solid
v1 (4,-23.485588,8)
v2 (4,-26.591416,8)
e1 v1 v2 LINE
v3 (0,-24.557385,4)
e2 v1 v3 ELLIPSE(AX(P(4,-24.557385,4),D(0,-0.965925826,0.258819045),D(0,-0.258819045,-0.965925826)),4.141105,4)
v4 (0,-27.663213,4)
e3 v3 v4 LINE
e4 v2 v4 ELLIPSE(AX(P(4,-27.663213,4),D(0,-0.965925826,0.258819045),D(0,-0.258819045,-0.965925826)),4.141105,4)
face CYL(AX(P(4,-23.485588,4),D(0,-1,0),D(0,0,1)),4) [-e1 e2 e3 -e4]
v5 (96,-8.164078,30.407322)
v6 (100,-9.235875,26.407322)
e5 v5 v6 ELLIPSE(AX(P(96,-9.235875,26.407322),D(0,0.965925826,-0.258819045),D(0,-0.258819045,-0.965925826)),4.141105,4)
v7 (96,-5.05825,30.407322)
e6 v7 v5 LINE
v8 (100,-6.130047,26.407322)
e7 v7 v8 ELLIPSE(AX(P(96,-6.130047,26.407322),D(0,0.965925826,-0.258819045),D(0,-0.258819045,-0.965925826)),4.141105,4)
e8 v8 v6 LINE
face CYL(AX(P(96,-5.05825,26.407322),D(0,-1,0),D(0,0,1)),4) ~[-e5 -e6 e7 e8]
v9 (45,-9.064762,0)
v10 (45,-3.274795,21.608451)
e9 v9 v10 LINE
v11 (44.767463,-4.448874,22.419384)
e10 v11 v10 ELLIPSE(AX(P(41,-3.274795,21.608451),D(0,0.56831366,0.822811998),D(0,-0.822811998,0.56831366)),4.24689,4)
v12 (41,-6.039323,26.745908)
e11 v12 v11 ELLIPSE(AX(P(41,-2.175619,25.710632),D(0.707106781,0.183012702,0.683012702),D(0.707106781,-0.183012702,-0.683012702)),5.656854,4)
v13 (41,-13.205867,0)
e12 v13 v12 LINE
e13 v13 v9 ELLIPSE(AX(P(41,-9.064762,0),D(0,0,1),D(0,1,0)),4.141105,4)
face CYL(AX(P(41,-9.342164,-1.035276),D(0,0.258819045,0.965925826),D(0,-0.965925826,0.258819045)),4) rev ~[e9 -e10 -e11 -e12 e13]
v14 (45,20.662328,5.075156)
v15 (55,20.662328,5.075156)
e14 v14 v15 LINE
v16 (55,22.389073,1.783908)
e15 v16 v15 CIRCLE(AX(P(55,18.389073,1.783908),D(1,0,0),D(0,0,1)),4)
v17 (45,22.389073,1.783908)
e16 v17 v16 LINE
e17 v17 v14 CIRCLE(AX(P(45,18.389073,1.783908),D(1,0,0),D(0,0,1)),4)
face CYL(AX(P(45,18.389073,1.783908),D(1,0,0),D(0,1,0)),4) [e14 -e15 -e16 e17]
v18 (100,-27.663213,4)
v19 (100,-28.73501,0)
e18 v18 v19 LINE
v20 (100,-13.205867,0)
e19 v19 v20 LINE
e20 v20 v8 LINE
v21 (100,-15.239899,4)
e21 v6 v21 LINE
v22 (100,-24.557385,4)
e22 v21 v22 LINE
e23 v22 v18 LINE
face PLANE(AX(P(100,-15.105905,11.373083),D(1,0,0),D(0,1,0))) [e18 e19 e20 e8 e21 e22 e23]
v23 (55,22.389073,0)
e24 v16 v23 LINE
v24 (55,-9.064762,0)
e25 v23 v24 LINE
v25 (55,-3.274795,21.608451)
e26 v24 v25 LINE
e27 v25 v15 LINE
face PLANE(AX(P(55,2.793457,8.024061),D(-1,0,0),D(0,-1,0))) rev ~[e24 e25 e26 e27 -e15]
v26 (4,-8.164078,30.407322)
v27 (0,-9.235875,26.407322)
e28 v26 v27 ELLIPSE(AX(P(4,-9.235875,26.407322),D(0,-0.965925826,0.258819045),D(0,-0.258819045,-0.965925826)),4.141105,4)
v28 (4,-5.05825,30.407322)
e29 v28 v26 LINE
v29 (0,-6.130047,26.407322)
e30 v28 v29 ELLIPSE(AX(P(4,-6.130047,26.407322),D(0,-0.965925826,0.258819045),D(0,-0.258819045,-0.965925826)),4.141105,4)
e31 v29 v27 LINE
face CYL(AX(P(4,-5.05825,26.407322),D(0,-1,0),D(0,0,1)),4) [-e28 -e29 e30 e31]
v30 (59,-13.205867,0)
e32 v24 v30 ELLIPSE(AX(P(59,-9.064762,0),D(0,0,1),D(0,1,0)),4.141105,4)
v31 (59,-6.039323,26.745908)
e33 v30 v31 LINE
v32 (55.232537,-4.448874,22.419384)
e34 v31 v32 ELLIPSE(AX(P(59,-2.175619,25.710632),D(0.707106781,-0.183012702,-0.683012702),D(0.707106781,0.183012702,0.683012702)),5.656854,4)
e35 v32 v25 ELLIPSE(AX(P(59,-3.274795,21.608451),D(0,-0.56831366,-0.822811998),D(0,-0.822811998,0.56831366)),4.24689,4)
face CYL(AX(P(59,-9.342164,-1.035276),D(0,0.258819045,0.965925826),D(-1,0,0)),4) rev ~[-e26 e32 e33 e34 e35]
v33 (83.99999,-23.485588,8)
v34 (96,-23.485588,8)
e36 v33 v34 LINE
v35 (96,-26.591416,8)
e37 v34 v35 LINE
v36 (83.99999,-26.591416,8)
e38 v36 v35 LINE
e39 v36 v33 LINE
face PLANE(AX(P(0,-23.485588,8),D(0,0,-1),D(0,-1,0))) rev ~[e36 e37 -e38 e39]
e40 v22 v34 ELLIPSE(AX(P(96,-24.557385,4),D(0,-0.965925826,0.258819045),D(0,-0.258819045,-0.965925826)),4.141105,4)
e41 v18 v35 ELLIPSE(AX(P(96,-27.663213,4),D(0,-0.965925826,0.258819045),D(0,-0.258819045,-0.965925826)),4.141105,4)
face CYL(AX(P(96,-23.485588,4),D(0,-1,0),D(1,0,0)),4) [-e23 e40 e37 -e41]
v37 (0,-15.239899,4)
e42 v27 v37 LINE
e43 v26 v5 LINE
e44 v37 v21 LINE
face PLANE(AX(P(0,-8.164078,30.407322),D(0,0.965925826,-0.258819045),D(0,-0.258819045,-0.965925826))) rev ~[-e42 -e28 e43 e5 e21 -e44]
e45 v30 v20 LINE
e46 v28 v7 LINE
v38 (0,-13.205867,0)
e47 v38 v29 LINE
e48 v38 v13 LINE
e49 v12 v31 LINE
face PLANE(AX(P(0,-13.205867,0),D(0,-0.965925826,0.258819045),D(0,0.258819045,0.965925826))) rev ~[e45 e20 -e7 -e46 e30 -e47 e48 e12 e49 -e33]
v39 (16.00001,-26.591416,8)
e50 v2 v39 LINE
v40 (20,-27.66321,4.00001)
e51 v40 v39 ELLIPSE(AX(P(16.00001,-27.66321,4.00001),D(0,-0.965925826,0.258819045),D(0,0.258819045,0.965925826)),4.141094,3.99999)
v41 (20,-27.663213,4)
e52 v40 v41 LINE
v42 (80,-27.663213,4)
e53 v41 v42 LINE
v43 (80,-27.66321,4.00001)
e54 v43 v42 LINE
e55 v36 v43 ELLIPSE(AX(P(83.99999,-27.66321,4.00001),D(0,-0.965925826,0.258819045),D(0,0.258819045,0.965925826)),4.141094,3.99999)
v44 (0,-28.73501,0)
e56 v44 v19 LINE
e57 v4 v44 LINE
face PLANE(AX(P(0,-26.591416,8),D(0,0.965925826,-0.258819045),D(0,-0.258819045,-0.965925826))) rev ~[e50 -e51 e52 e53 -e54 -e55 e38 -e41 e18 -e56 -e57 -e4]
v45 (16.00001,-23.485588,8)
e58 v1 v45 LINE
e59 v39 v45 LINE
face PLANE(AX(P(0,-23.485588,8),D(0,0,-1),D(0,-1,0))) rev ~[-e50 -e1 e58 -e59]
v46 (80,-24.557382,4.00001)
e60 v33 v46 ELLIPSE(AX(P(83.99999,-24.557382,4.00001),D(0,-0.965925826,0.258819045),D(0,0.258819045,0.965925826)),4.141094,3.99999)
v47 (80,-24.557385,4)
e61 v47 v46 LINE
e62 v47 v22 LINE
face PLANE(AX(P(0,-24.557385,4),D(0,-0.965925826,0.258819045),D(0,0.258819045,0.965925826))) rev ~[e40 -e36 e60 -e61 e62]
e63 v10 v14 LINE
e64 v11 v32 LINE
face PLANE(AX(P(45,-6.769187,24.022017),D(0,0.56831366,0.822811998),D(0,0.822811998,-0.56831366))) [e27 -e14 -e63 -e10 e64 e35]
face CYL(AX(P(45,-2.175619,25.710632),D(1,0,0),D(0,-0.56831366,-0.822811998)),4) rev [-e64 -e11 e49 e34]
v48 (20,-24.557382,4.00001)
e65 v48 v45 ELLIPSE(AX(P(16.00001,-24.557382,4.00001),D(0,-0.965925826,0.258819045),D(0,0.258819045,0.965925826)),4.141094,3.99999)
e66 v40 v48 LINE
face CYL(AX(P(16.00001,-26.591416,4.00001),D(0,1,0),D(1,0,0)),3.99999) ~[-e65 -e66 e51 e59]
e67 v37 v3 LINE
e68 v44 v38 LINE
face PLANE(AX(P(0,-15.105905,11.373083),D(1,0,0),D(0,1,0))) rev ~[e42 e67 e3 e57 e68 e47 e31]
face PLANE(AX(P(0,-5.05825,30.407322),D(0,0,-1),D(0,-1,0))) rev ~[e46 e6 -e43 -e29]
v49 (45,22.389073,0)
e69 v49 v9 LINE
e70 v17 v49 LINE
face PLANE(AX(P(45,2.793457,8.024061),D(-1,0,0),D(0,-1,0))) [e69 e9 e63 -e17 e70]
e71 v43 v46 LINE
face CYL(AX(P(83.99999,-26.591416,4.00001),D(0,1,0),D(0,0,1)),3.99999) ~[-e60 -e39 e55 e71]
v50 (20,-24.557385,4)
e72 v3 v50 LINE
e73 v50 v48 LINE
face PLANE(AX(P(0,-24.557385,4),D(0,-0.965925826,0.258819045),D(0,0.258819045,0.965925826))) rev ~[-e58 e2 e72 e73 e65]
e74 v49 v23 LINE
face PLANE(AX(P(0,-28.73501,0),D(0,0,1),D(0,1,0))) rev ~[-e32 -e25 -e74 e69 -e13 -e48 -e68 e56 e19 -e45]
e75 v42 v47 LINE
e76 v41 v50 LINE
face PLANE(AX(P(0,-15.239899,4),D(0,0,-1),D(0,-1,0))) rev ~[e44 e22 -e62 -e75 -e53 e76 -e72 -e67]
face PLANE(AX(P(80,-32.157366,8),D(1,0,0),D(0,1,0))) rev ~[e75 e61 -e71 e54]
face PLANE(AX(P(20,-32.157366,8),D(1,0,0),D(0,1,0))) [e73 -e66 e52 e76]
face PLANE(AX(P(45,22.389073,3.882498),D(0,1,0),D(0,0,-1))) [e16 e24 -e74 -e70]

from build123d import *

# Parameters (mm, degrees)
F1_DEPTH = 100
F3_START = -45
F3_DEPTH = 10
F4_R     = 4
F5_W     = 60
F5_H     = 8.6717781019
F6_DEPTH = 4
F7_R     = 3.99999


# Not quite as in the source:
# - a fillet or chamfer is up to 0.001 mm smaller than in the source, because OpenCascade refuses the exact size


with BuildPart() as f1:
    # F0 (on Right) → F1 (new body)
    with BuildSketch(Plane.YZ):
        Polygon((-5.0582498297, 30.4073218231), (-8.1640783709, 30.4073218231), (-15.2398989277, 4), (-24.5573845514, 4), (-23.4855877816, 8), (-26.5914163229, 8), (-28.7350098623, 0), (-13.2058671562, 0), align=None)
    extrude(amount=F1_DEPTH)

    # F2 (on face) → F3 (join)
    with BuildSketch(Plane(origin=(0, 0, 0), x_dir=(0, -1, 0), z_dir=(-1, 0, 0)).offset(F3_START)):
        Polygon((13.2058671562, 0), (6.7691872092, 24.0220165943), (-22.3890729249, 3.8824980147), (-22.3890729249, 0), align=None)
    extrude(amount=-F3_DEPTH)

    # F4 (call 1 of 6: OpenCascade refuses the feature's edges together)
    f4_edges = [f1.edges().sort_by_distance(p)[0] for p in [
        (0, -6.611164, 30.407322),
    ]]
    fillet(f4_edges, radius=F4_R)

    # F4#2 (call 2 of 6)
    f4_2_edges = [f1.edges().sort_by_distance(p)[0] for p in [
        (100, -6.611164, 30.407322),
    ]]
    fillet(f4_2_edges, radius=F4_R)

    # F4#3 (call 3 of 6)
    f4_3_edges = [f1.edges().sort_by_distance(p)[0] for p in [
        (100, -25.038502, 8),
    ]]
    fillet(f4_3_edges, radius=F4_R)

    # F4#4 (call 4 of 6)
    f4_4_edges = [f1.edges().sort_by_distance(p)[0] for p in [
        (0, -25.038502, 8),
    ]]
    fillet(f4_4_edges, radius=F4_R)

    # F4#5 (call 5 of 6)
    f4_5_edges = [f1.edges().sort_by_distance(p)[0] for p in [
        (50, 22.389073, 3.882498),
    ]]
    fillet(f4_5_edges, radius=F4_R)

    # F4#6 (call 6 of 6)
    f4_6_edges = [f1.edges().sort_by_distance(p)[0] for p in [
        (50, -6.769187, 24.022017),
        (45, -9.987527, 12.011008),
        (55, -9.987527, 12.011008),
    ]]
    fillet(f4_6_edges, radius=F4_R)

    # F5 (on face) → F6 (cut)
    with BuildSketch(Plane.XY.offset(8)):
        with Locations((50, -27.8214768326)):
            Rectangle(F5_W, F5_H)
    extrude(amount=-F6_DEPTH, mode=Mode.SUBTRACT)

    # F7 (radius 4 in the source; OpenCascade refuses exactly that, so slightly less here)
    f7_edges = [f1.edges().sort_by_distance(p)[0] for p in [
        (20, -25.038502, 8),
        (80, -25.038502, 8),
    ]]
    fillet(f7_edges, radius=F7_R)


solid = f1.part
